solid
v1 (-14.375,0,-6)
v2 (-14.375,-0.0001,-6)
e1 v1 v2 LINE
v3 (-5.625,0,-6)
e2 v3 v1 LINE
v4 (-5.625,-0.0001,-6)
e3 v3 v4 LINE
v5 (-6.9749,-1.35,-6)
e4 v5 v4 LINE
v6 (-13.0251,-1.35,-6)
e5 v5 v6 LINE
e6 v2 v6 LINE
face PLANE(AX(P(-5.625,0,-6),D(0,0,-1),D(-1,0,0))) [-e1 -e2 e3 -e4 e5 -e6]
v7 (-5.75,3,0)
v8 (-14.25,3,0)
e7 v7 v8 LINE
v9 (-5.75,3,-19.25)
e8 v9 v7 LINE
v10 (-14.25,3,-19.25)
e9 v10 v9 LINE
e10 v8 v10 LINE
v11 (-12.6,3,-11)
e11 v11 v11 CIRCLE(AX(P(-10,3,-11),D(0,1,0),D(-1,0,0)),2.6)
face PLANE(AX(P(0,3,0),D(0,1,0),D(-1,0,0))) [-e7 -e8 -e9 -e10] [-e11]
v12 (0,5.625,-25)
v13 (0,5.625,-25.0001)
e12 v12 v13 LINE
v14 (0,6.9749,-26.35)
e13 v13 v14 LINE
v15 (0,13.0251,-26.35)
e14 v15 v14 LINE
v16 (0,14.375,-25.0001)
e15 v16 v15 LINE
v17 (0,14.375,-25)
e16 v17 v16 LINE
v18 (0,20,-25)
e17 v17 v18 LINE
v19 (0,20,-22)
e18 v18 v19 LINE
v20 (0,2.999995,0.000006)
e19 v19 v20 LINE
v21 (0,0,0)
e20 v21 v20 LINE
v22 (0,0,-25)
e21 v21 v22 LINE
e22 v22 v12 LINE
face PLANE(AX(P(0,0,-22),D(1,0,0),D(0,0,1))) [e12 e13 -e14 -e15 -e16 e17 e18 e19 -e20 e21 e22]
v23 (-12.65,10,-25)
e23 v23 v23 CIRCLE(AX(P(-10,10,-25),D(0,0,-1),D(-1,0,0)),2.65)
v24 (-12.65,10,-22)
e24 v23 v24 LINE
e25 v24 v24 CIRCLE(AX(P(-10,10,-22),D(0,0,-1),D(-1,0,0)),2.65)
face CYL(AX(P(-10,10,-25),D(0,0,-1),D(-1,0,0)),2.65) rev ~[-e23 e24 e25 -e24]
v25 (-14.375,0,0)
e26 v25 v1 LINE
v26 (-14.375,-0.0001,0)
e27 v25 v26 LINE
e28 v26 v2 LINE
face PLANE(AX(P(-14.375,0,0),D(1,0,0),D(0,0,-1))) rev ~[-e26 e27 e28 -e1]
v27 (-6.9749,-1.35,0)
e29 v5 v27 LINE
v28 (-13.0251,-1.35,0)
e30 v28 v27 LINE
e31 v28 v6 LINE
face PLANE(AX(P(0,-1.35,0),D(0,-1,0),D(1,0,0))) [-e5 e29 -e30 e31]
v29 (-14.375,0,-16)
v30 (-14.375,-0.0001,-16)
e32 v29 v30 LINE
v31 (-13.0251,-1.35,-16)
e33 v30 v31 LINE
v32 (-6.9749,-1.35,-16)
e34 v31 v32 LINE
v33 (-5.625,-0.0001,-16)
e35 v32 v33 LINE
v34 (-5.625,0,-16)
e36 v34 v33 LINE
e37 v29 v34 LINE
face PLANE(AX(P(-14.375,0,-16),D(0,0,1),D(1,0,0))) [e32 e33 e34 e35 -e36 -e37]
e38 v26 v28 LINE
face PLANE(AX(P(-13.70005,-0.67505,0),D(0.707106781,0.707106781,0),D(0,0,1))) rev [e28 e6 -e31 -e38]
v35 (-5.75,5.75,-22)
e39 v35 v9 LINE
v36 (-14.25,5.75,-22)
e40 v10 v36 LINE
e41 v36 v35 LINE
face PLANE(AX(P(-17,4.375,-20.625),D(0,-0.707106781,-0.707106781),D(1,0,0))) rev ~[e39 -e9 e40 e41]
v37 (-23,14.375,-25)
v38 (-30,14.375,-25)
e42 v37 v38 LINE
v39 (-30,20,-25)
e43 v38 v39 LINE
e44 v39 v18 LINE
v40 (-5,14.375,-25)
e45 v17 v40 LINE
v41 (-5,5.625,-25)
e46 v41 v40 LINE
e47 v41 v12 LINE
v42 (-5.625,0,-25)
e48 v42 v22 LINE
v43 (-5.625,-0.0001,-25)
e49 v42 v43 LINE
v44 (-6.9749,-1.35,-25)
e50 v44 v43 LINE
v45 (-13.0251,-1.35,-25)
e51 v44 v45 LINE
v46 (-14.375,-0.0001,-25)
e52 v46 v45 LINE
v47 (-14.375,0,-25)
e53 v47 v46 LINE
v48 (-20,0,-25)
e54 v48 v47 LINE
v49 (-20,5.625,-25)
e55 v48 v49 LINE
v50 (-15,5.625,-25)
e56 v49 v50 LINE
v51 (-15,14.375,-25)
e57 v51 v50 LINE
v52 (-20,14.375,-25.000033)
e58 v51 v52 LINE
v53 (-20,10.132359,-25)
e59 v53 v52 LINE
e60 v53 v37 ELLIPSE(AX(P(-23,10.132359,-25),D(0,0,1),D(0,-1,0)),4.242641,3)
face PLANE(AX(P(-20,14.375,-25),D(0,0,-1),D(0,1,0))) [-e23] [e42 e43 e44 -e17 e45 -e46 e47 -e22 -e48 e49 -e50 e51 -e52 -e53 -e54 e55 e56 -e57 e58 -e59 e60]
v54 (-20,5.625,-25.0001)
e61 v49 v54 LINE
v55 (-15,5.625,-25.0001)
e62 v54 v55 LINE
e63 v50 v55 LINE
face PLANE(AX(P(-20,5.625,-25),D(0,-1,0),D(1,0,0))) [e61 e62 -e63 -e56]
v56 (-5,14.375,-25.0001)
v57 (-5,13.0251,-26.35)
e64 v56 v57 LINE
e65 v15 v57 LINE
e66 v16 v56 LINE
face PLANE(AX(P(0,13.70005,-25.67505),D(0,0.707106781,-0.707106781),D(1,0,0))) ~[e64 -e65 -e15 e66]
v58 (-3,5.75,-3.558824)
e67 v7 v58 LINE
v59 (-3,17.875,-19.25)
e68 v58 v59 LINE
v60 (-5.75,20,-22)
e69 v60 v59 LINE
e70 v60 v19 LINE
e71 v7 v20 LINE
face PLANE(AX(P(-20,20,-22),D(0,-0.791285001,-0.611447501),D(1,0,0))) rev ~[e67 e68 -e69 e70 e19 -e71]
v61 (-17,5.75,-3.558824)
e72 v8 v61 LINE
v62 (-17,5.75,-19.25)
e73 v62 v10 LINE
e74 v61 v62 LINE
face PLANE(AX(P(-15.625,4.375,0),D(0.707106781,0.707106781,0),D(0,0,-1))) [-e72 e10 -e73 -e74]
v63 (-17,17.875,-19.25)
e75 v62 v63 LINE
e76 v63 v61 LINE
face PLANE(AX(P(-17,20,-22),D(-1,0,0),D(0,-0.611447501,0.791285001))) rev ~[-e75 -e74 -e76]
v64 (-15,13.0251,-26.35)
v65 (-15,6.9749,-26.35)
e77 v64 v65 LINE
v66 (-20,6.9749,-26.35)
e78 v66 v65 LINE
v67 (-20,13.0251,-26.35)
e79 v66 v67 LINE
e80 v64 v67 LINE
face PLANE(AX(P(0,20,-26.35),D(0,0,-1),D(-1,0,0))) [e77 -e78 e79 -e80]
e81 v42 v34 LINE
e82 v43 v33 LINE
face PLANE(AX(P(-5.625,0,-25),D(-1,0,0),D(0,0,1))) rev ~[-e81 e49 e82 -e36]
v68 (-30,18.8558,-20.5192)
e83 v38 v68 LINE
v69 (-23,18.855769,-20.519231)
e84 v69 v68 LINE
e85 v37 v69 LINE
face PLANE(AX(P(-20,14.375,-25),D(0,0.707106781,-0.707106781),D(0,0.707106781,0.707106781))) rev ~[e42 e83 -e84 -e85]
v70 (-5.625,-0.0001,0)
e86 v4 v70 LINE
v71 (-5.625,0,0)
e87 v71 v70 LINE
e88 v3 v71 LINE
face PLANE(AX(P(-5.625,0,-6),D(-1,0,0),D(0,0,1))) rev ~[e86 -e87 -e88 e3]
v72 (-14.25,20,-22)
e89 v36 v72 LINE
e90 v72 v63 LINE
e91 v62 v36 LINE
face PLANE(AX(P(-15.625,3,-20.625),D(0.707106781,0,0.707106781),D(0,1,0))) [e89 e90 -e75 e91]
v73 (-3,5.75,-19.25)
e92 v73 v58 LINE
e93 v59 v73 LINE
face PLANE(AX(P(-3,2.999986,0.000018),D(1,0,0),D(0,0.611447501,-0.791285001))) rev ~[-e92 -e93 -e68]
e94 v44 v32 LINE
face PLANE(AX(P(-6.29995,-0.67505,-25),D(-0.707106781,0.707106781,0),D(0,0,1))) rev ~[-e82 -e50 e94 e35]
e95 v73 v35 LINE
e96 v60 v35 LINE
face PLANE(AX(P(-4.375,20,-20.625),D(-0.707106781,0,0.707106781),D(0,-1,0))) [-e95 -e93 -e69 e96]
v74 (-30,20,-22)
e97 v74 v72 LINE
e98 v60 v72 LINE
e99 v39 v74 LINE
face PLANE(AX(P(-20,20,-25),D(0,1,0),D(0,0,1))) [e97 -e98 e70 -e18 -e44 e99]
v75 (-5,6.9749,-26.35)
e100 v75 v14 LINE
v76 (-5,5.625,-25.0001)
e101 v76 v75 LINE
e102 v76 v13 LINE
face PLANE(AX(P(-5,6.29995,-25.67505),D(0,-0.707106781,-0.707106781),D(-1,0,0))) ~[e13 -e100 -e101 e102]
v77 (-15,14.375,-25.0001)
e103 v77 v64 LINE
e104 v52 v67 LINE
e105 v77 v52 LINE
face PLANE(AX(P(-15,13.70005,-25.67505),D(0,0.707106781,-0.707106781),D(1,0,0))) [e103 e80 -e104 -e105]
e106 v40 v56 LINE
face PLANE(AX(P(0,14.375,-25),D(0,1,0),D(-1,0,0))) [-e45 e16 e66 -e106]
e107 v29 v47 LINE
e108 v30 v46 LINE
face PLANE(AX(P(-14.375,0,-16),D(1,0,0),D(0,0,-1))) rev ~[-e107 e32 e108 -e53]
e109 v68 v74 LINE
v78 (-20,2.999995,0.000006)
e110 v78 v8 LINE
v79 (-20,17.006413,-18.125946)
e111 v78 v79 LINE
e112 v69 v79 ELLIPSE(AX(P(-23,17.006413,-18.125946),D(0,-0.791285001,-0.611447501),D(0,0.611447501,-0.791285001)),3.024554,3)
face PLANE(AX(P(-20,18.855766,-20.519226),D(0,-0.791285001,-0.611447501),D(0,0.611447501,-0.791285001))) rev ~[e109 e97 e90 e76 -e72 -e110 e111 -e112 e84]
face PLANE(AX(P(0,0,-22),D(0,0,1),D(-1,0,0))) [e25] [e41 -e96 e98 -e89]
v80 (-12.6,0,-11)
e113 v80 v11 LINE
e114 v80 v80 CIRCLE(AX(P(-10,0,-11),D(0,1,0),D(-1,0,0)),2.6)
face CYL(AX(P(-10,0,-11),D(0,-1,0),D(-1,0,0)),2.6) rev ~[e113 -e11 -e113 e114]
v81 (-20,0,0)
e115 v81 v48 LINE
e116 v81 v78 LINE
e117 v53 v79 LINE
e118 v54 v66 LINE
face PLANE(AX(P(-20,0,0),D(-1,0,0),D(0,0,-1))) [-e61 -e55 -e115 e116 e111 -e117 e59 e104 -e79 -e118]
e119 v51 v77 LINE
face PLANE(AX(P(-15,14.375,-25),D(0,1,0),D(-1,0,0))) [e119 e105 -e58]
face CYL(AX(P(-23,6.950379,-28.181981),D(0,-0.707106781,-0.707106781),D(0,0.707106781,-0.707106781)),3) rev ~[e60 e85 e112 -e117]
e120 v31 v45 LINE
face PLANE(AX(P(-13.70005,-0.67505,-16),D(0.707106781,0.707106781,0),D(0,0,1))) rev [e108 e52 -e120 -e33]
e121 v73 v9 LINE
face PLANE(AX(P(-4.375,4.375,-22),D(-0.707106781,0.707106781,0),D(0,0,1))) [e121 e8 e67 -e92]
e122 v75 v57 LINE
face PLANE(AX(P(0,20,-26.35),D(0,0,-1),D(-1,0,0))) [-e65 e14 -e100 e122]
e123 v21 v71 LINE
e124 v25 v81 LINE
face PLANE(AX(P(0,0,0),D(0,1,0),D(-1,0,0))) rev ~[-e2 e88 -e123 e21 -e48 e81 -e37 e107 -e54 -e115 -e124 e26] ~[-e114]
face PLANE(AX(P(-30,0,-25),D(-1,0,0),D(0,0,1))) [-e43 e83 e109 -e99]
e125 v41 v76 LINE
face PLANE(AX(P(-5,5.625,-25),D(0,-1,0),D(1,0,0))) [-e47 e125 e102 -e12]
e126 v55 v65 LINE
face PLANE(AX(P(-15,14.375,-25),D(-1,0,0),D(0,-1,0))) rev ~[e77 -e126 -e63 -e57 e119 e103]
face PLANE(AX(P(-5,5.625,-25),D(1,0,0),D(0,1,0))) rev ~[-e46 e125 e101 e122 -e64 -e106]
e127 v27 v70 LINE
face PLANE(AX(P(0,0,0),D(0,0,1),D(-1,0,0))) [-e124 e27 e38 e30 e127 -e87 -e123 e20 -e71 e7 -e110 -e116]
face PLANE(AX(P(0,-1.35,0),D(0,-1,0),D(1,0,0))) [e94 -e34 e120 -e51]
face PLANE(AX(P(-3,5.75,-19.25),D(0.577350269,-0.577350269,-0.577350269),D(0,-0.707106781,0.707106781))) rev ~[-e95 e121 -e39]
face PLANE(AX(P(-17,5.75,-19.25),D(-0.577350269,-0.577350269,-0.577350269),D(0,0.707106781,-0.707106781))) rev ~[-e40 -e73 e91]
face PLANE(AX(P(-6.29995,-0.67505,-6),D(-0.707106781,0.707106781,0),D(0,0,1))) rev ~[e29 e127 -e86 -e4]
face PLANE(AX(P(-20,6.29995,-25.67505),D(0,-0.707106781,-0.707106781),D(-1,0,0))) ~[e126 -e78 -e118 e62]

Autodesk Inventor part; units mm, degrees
ref_plane "YZ Plane" through (0, 0, 0) normal (1, 0, 0) x (0, 1, 0)
ref_plane "XZ Plane" through (0, 0, 0) normal (0, 1, 0) x (-1, 0, 0)
sketch "Sketch1" plane through (0, 0, 0) normal (0, 1, 0) x (-1, 0, 0)
  line L0 (0, 0) -> (20, 0)
  line L1 (20, 0) -> (20, -25)
  line L2 (20, -25) -> (0, -25)
  line L3 (0, -25) -> (0, 0)
  circle A0 centre (10, -11) radius 2.6
  line L4 (20, -25) -> (0, -25)
  line L5 (0, -25) -> (0, -22)
  line L6 (0, -22) -> (20, -22)
  line L7 (20, -22) -> (20, -25)
  line L8 (0, -22) -> (20, 0) construction
  point P0 (10, -11)
  dimension "d2" = 20
  dimension "d3" = 25
  dimension "d4" = 5.2
  dimension "d7" = 3
extrude "Extrusion1" add sketch "Sketch1" along normal blind 3
extrude "Extrusion2" add sketch "Sketch1" along normal blind 20 contours L6 L1 L2 L3
sketch "Sketch2" plane through (0, 0, -25) normal (0, 0, -1) x (-1, 0, 0)
  line L0 (0, 0) -> (0, 20) projected
  line L1 (20, 0) -> (20, 20) projected
  line L2 (0, 20) -> (20, 0) construction
  circle A0 centre (10, 10) radius 2.65
  dimension "d10" = 5.3
extrude "Extrusion3" cut sketch "Sketch2" against normal through all
ref_plane "Work Plane1" through (-20, 20, -22) normal (0, -0.791285, -0.6114475) x (1, 0, 0)
sketch "Sketch3" plane through (-20, 20, -22) normal (0, -0.791285, -0.6114475) x (1, 0, 0)
  line L0 (0, 27.8029) -> (20, 27.8029) projected
  line L1 (0, 0) -> (20, 0) projected
  line L2 (0, 10.3946) -> (0, 0) projected
  line L3 (0, 0) -> (3, 0)
  line L4 (3, 0) -> (3, 27.8029)
  line L5 (3, 27.8029) -> (0, 27.8029)
  line L6 (0, 27.8029) -> (0, 0)
  line L7 (20, 27.8029) -> (17, 27.8029)
  line L8 (17, 27.8029) -> (17, 0)
  line L9 (17, 0) -> (20, 0)
  line L10 (20, 0) -> (20, 27.8029)
  point P0 (20, 29.6372)
  point P1 (20, 0)
  dimension "d13" = 3
  dimension "d14" = 3
extrude "Extrusion4" add sketch "Sketch3" along normal up to next contours L0 L4 L1 L2 L6 | L0 L10 L1 L8
chamfer "Chamfer1" distance 2.75 angle 45 5 edges at (-10, 3, -22) (-3, 11.5, -22) (-3, 3, -11) (-17, 3, -11) (-17, 11.5, -22)
sketch "Sketch4" plane through (0, 0, 0) normal (0, -1, 0) x (1, 0, 0)
  line L0 (0, -25) -> (-20, -25) projected
  line L1 (-20, 0) -> (0, 0) projected
  line L2 (-14.375, -25) -> (-5.625, -25)
  line L3 (-5.625, -25) -> (-5.625, 0)
  line L4 (-5.625, 0) -> (-14.375, 0)
  line L5 (-14.375, 0) -> (-14.375, -25)
  circle A0 centre (-10, -11) radius 2.6 projected
  line L6 (-10, -25) -> (-10, 0) construction
  line L7 (-5.625, -6) -> (-14.375, -6)
  line L8 (-14.375, -6) -> (-14.375, -16)
  line L9 (-14.375, -16) -> (-5.625, -16)
  line L10 (-5.625, -16) -> (-5.625, -6)
  line L11 (-14.375, -16) -> (-5.625, -6) construction
  point P0 (-14.375, 0)
  dimension "d32" = 8.75
  dimension "d42" = 10
extrude "Extrusion5" add sketch "Sketch4" along normal blind 1.35 contours L0 L5 L9 L3 | L7 L5 L1 L3
sketch "Sketch5" plane through (0, 20, -25) normal (0, 0, -1) x (-1, 0, 0)
  line L0 (0, 0) -> (0, -17) projected
  line L1 (20, -17) -> (20, 0) projected
  line L2 (0, -5.625) -> (20, -5.625)
  line L3 (20, -5.625) -> (20, -14.375)
  line L4 (20, -14.375) -> (0, -14.375)
  line L5 (0, -14.375) -> (0, -5.625)
  line L6 (0, -14.375) -> (20, -5.625) construction
  circle A0 centre (10, -10) radius 2.65 projected
  line L7 (5, -5.625) -> (15, -5.625)
  line L8 (15, -5.625) -> (15, -14.375)
  line L9 (15, -14.375) -> (5, -14.375)
  line L10 (5, -14.375) -> (5, -5.625)
  line L11 (5, -5.625) -> (15, -14.375) construction
  point P0 (0, -20)
  point P1 (0, -14.375)
  point P2 (5, -14.375)
  dimension "d26" = 8.75
  dimension "d43" = 10
extrude "Extrusion6" add sketch "Sketch5" along normal blind 1.35 contours L2 L10 L4 L0 | L2 L1 L4 L8
chamfer "Chamfer2" distance 1.35 angle 45 8 edges at (-17.5, 5.625, -26.35) (-2.5, 5.625, -26.35) (-17.5, 14.375, -26.35) (-2.5, 14.375, -26.35) (-14.375, -1.35, -3) (-14.375, -1.35, -20.5) (-5.625, -1.35, -3) (-5.625, -1.35, -20.5)
sketch "Sketch9" plane through (-20, 0, -25) normal (-1, 0, 0) x (0, 0, 1)
  line L0 (-1.35, 6.975) -> (-1.35, 13.025) projected
  line L1 (0, 0) -> (0, 5.625) projected
  line L2 (0, 0) -> (25, 0) projected
  line L3 (25, 0) -> (25, 3) projected
  line L4 (25, 3) -> (3, 20) projected
  line L5 (0, 20) -> (3, 20) projected
  line L6 (0, 14.375) -> (0, 20) projected
  line L7 (0, 14.375) -> (4.4808, 18.8558)
  line L8 (-1.35, 13.025) -> (0, 14.375) projected
  line L9 (0, 5.625) -> (-1.35, 6.975) projected
  point P0 (25, 0)
extrude "Extrusion10" add sketch "Sketch9" along normal blind 10 contours L6 L5 L4 L7
fillet "Fillet2" radius 3 1 edges at (-20, 16.6154, -22.7596)
properties part number "Soporte Actuador MIR" material "PET Plastic"
